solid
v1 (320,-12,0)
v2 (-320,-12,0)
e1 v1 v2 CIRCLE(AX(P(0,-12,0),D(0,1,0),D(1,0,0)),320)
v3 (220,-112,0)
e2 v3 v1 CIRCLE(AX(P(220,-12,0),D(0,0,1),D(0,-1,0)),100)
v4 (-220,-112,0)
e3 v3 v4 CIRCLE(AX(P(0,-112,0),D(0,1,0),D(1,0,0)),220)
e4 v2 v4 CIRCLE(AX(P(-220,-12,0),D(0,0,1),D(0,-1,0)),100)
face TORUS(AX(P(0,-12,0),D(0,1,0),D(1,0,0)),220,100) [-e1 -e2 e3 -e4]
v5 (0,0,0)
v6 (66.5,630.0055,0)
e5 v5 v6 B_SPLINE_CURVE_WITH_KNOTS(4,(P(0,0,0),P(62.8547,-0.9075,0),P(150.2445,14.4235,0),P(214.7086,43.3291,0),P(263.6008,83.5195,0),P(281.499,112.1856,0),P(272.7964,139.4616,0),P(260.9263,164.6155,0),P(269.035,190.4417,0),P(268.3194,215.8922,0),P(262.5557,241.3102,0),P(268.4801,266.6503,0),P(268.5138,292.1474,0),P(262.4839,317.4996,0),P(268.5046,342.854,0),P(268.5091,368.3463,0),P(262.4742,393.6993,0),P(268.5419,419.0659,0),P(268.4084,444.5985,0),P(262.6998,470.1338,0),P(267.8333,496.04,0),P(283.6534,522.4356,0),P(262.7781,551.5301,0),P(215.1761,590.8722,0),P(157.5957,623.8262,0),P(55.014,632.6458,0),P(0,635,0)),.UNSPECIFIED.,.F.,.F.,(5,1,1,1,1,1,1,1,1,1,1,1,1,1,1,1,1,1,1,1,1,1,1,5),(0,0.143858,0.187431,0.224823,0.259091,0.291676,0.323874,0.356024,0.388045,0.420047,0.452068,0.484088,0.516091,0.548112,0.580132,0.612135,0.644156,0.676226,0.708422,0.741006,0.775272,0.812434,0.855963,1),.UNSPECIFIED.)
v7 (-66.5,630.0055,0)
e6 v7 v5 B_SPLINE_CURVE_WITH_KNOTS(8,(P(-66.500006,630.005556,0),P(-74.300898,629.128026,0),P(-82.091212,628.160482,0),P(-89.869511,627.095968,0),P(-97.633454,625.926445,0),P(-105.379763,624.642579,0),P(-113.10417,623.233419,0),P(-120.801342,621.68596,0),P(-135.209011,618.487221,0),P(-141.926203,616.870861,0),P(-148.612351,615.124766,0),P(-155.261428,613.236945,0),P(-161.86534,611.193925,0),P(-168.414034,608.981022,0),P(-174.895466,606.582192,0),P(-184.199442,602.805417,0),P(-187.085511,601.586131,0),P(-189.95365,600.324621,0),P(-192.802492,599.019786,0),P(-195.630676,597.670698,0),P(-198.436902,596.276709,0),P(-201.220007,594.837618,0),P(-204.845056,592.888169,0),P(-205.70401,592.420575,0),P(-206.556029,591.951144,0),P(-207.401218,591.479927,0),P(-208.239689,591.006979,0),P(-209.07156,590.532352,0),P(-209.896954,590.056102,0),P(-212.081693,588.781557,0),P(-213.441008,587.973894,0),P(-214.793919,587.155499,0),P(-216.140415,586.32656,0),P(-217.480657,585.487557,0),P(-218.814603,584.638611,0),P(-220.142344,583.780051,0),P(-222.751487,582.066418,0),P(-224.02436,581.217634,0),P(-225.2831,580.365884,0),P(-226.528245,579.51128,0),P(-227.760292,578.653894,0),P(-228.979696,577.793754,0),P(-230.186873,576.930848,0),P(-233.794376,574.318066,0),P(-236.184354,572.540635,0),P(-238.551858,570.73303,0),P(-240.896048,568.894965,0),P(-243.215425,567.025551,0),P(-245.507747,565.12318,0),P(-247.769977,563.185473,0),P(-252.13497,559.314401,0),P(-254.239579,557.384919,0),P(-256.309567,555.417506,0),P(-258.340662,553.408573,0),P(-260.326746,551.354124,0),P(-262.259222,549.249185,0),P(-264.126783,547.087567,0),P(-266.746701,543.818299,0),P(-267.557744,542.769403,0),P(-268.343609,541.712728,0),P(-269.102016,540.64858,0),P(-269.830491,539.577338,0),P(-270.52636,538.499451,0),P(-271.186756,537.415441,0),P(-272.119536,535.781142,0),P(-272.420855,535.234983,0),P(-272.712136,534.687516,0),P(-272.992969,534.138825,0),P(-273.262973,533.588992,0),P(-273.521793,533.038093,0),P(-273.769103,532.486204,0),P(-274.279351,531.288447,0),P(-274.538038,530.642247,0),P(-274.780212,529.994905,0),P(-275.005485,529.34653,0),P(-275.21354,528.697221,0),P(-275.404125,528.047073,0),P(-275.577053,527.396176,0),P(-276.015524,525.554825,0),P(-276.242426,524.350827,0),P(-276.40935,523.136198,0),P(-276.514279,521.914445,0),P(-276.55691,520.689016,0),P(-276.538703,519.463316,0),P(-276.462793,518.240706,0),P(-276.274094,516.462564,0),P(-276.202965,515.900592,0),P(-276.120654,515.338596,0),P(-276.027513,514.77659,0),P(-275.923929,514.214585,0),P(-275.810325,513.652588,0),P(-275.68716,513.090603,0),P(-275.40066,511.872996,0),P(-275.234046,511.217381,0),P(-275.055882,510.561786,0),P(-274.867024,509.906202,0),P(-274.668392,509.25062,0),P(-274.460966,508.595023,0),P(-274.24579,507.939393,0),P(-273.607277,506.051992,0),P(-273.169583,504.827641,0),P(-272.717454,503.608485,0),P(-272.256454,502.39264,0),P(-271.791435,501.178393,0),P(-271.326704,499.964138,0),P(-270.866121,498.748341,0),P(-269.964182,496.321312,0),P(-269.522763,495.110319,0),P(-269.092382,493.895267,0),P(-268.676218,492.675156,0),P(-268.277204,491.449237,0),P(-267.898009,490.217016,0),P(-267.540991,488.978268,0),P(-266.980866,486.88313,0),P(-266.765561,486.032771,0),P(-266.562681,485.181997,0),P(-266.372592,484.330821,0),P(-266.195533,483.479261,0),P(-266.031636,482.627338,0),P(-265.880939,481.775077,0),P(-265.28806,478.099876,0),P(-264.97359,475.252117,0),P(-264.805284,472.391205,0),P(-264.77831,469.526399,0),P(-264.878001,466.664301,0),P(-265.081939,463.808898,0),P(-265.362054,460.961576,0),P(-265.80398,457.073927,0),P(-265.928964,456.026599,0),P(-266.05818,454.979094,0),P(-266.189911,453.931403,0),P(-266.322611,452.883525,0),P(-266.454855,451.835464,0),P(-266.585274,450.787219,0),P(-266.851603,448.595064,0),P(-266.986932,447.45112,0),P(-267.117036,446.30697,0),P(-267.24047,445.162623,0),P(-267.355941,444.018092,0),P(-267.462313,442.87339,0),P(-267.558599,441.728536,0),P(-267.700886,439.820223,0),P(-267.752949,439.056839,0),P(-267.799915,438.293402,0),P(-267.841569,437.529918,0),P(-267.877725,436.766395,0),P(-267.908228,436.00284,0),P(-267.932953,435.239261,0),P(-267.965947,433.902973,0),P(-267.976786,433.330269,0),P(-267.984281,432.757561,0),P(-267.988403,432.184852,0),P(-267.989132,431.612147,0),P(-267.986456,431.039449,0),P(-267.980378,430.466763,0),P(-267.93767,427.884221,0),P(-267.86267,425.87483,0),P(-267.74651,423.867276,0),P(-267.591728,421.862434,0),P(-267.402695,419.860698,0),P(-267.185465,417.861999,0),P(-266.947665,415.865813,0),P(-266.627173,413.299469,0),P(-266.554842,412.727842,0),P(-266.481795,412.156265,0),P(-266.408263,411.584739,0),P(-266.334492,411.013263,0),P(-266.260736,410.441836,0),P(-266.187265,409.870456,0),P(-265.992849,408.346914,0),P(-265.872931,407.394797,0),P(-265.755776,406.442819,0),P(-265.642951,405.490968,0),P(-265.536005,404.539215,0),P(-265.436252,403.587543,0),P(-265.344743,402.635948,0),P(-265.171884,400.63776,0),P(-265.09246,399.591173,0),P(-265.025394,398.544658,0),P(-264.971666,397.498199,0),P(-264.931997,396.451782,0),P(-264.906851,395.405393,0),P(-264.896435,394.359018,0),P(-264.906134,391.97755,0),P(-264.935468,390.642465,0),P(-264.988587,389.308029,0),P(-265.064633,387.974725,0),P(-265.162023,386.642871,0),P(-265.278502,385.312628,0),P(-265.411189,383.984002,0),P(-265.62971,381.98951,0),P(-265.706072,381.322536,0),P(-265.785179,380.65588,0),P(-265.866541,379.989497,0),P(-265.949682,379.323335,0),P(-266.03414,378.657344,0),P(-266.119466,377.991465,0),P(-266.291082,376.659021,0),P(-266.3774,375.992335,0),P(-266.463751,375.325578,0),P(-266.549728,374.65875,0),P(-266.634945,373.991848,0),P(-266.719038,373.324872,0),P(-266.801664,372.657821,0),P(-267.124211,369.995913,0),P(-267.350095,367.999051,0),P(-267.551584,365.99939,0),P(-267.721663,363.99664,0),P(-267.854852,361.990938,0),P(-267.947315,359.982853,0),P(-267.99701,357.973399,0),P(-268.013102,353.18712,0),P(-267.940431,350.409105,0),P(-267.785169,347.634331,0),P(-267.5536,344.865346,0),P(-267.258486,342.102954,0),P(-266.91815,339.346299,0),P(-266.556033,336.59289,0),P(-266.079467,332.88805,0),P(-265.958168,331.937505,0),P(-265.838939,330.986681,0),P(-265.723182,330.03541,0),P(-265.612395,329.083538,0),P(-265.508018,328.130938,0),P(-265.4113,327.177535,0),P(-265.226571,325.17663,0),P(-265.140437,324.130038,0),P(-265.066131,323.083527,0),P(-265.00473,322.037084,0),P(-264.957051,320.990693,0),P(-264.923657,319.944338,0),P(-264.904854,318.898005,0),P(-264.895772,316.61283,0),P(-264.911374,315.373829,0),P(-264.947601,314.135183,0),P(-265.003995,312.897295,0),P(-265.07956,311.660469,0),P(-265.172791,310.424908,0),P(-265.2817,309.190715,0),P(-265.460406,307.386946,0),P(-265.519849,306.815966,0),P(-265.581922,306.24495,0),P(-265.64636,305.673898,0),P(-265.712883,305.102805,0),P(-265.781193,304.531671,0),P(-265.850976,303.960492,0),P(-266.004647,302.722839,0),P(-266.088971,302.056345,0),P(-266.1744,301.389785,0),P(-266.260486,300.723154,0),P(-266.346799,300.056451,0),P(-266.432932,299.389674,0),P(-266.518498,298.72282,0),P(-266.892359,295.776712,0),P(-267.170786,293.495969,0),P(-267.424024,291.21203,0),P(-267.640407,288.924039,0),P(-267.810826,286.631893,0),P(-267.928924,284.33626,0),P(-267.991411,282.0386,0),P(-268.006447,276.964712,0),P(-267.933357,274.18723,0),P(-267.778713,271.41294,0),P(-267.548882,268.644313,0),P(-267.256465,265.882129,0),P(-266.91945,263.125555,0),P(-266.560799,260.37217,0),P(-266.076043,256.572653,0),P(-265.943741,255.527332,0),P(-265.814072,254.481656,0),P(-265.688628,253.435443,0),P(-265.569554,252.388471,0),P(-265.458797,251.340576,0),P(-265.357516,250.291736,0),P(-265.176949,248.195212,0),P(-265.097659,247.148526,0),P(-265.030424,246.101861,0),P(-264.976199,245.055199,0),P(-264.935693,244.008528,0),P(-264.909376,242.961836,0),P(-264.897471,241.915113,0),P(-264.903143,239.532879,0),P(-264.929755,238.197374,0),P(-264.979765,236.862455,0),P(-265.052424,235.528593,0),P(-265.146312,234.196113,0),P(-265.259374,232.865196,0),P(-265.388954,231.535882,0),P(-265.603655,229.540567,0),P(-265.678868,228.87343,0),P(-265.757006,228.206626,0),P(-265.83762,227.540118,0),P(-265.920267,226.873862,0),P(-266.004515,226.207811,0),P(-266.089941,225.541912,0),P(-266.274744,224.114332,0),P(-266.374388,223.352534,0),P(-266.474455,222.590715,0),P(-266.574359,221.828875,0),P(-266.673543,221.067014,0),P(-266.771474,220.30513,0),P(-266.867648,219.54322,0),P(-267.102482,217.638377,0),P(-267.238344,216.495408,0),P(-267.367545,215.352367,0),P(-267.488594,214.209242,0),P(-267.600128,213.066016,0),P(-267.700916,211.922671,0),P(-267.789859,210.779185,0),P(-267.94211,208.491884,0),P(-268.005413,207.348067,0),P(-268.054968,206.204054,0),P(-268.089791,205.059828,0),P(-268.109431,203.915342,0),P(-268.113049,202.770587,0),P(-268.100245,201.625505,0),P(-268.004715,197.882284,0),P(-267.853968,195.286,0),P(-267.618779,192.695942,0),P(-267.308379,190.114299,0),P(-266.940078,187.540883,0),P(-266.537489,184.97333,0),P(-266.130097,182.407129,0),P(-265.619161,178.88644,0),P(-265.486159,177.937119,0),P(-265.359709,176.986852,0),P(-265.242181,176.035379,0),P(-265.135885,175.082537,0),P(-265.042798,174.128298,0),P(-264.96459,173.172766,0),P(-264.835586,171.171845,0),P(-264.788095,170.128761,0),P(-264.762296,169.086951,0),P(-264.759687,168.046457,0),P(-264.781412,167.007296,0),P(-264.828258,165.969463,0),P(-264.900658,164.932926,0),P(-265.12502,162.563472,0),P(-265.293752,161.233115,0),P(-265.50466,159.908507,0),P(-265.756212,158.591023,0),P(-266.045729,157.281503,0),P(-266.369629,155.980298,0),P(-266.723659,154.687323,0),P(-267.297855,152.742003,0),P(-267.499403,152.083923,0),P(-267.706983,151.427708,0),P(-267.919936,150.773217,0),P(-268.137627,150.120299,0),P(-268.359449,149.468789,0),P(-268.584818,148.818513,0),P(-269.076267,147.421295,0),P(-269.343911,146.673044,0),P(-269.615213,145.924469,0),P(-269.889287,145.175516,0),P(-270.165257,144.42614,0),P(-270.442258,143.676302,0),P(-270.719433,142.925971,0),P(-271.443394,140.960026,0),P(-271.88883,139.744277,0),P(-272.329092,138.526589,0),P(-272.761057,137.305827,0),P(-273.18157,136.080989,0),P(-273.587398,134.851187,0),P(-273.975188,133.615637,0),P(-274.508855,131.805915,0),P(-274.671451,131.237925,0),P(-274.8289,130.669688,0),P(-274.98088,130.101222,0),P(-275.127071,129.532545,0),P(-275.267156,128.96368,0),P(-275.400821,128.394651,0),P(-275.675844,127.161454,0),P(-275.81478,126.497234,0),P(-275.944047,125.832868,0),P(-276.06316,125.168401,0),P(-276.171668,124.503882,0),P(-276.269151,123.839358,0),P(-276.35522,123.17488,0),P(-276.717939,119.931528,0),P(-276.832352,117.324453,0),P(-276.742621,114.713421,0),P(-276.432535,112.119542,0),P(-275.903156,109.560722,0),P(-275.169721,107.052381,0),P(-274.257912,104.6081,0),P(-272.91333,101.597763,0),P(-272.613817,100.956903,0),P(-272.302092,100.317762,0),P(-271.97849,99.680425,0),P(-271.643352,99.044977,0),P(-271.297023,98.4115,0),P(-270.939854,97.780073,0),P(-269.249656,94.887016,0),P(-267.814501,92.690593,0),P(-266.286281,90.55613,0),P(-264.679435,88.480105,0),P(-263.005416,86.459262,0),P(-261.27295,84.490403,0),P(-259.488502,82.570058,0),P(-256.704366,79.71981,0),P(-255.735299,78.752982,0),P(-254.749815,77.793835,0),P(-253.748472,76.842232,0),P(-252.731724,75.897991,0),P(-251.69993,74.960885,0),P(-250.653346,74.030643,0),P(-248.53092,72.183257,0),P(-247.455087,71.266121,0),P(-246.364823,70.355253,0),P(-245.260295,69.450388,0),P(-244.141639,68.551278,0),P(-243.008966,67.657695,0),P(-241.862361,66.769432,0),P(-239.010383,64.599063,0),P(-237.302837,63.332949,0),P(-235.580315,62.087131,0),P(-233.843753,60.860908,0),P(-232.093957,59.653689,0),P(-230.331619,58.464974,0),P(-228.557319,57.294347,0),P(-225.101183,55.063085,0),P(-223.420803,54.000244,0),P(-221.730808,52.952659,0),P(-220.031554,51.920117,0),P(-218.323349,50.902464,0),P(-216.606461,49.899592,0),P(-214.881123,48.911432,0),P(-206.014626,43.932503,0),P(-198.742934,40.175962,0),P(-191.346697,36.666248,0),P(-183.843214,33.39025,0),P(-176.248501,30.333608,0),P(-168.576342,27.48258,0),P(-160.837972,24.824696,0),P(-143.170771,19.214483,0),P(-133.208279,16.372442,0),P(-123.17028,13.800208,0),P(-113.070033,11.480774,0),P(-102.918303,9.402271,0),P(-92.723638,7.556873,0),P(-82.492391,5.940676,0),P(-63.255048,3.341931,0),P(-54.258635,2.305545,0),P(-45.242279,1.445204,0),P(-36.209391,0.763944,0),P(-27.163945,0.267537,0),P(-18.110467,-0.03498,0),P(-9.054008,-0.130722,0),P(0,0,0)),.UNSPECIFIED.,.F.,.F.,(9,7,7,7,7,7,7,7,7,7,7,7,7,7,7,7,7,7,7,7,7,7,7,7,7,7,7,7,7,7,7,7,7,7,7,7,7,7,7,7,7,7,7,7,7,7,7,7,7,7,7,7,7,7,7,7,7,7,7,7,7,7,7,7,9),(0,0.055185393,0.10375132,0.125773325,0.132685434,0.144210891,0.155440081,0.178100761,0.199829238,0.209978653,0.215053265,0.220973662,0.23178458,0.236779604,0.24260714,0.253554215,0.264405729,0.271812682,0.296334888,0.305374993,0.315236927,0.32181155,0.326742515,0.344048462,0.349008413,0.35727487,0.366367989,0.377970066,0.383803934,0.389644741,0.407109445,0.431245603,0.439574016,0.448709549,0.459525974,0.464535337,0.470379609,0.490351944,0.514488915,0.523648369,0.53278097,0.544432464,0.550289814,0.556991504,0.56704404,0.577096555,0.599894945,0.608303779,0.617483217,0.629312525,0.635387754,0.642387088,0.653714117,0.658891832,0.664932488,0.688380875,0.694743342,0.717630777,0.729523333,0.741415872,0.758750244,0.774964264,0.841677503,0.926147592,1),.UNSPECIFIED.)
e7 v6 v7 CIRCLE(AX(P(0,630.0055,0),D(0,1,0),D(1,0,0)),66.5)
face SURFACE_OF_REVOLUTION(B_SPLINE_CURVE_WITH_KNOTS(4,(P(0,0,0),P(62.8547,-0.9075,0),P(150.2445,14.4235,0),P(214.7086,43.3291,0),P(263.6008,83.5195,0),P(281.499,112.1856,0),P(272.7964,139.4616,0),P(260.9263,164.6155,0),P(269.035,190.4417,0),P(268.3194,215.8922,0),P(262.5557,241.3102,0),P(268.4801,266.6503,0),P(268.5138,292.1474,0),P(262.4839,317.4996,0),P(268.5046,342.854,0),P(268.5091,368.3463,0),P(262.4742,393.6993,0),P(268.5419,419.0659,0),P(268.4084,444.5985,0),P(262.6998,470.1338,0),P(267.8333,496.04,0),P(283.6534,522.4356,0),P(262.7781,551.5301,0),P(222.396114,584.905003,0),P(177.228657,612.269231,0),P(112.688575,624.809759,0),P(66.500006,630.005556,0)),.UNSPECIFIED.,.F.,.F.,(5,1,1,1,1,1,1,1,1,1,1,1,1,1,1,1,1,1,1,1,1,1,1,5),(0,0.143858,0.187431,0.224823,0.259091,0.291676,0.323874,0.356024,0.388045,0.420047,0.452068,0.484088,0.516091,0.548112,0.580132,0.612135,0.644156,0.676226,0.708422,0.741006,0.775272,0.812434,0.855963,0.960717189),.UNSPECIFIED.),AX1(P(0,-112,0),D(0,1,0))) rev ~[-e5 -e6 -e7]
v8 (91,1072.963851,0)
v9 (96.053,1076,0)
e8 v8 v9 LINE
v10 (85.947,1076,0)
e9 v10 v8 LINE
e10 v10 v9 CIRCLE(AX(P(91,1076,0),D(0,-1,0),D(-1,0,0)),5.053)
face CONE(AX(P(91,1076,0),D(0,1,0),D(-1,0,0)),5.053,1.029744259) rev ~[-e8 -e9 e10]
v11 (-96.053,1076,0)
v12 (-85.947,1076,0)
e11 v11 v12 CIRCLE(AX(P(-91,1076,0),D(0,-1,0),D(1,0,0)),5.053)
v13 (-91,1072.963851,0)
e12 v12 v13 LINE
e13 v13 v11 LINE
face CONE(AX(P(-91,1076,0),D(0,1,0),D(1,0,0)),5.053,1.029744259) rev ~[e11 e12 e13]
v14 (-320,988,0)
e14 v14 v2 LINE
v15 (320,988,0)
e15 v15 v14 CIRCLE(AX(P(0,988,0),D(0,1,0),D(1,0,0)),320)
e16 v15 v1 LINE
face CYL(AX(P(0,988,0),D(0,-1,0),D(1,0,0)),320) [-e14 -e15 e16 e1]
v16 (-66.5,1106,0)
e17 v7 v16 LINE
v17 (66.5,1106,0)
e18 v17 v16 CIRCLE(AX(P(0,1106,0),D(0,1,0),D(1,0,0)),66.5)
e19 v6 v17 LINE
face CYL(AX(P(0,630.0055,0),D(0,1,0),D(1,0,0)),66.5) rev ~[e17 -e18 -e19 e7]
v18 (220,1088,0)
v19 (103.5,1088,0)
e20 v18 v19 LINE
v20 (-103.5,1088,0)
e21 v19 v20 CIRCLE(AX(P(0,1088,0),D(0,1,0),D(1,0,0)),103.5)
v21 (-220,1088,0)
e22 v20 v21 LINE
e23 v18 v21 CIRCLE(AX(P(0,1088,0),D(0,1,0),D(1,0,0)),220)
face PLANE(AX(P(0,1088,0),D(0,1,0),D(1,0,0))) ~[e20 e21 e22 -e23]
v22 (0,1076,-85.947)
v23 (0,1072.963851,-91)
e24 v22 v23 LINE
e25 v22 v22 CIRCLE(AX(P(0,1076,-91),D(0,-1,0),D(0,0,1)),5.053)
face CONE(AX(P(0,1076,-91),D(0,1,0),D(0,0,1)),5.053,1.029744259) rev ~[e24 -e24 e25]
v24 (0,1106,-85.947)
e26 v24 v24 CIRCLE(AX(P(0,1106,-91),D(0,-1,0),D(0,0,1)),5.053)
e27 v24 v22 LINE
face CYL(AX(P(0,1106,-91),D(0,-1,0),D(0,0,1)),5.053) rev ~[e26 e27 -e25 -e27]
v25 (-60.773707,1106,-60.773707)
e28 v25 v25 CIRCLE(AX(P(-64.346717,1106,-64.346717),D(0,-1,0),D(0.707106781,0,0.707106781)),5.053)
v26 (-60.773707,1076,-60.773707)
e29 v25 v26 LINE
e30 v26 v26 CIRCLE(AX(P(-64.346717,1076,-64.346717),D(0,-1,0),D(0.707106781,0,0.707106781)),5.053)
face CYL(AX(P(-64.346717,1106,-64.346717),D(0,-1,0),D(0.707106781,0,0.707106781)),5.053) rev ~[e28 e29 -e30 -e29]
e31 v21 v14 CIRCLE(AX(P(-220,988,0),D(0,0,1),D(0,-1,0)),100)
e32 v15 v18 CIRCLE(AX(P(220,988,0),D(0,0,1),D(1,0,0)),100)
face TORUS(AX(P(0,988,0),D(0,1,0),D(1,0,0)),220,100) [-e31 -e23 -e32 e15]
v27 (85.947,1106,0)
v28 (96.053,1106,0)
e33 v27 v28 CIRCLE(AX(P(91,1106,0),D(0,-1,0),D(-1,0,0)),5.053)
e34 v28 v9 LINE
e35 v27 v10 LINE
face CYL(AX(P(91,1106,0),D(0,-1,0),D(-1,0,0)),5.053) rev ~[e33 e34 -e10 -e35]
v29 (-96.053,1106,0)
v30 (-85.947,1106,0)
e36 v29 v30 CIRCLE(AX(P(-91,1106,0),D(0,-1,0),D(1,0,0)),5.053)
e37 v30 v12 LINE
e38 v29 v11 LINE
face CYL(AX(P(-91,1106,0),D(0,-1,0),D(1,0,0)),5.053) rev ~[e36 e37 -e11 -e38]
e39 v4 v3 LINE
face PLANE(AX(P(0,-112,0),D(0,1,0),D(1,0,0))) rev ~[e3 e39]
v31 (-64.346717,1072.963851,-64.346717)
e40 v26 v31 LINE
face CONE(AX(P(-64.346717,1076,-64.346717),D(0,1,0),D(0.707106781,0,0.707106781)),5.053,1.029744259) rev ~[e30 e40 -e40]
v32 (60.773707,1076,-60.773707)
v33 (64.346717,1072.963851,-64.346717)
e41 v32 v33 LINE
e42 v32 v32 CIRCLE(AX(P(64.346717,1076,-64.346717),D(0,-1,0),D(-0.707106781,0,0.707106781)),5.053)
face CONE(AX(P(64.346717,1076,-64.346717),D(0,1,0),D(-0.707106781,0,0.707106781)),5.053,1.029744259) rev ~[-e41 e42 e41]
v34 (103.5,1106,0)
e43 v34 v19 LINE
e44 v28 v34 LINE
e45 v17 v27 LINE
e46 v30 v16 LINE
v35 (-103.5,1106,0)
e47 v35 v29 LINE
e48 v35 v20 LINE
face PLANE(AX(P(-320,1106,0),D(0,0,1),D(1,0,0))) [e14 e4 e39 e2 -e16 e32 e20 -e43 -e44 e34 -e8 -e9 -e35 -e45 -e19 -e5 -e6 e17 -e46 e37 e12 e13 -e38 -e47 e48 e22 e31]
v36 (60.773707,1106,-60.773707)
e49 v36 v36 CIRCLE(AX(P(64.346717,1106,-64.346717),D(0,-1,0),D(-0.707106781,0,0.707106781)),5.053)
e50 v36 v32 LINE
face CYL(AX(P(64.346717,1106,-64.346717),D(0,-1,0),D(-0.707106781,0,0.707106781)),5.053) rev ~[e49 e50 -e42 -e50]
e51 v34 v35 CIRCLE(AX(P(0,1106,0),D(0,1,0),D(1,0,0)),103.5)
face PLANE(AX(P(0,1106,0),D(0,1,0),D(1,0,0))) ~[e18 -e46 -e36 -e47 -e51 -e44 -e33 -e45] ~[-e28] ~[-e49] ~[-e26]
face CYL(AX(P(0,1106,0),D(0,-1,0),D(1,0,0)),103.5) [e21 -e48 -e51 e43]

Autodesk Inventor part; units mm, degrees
ref_plane "YZ Plane" through (0, 0, 0) normal (1, 0, 0) x (0, 1, 0)
ref_plane "XZ Plane" through (0, 0, 0) normal (0, 1, 0) x (-1, 0, 0)
ref_plane "XY Plane" through (0, 0, 0) normal (0, 0, 1) x (1, 0, 0)
sketch "InnerShape" plane through (0, 0, 0) normal (0, 0, 1) x (1, 0, 0)
  spline S0 degree 4 poles (25.5438, 42.0281) (88.3985, 41.1205) (175.7883, 56.4516) (240.2524, 85.3572) (289.1446, 125.5476) (307.0428, 154.2136) (298.3402, 181.4897) (286.4701, 206.6436) (294.5788, 232.4697) (293.8632, 257.9202) (288.0995, 283.3382) (294.0239, 308.6783) (294.0576, 334.1754) (288.0277, 359.5276) (294.0484, 384.8821) (294.0529, 410.3743) (288.018, 435.7273) (294.0857, 461.094) (293.9522, 486.6266) (288.2436, 512.1618) (293.3771, 538.0681) (309.1971, 564.4637) (288.3219, 593.5581) (240.7199, 632.9003) (183.1395, 665.8542) (80.5578, 674.6739) (25.5438, 677.0281) knots 0 0 0 0 0 0.143858 0.187431 0.224823 0.259091 0.291676 0.323874 0.356024 0.388045 0.420047 0.452068 0.484088 0.516091 0.548112 0.580132 0.612135 0.644156 0.676226 0.708422 0.741006 0.775272 0.812434 0.855963 1 1 1 1 1
  point P0 (254.729, 359.5281)
  point P1 (142.9438, 54.7281)
  point P2 (219.4438, 80.1281)
  point P3 (263.0438, 105.5281)
  point P4 (290.4438, 130.9281)
  point P5 (302.0438, 156.3281)
  point P6 (297.4438, 181.7281)
  point P7 (290.4438, 207.1281)
  point P8 (292.8438, 232.5281)
  point P9 (292.8438, 257.9281)
  point P10 (290.4438, 283.3281)
  point P11 (292.8438, 308.7281)
  point P12 (292.8438, 334.1281)
  point P13 (290.4438, 359.5281)
  point P14 (292.8438, 384.9281)
  point P15 (292.8438, 410.3281)
  point P16 (290.4438, 435.7281)
  point P17 (292.8438, 461.1281)
  point P18 (292.8438, 486.5281)
  point P19 (290.4438, 511.9281)
  point P20 (295.1438, 537.3281)
  point P21 (302.0438, 562.7281)
  point P22 (290.4438, 588.1281)
  point P23 (263.0438, 613.5281)
  point P24 (222.6438, 638.9281)
  point P25 (142.9438, 664.3281)
sketch "Sketch2" plane through (0, 0, 0) normal (0, 0, 1) x (1, 0, 0)
  line L0 (66.5, 630.0055) -> (66.5, 1106)
  line L1 (66.5, 1106) -> (103.5, 1106)
  line L2 (103.5, 1106) -> (103.5, 1088)
  line L3 (103.5, 1088) -> (220, 1088)
  line L4 (320, 988) -> (320, -12)
  line L5 (220, -112) -> (0, -112)
  line L6 (0, -112) -> (0, 0)
  arc A0 (320, 988) -> (220, 1088) centre (220, 988) ccw
  arc A1 (220, -112) -> (320, -12) centre (220, -12) ccw
  spline S0 degree 4 poles (0, 0) (62.8547, -0.9075) (150.2445, 14.4235) (214.7086, 43.3291) (263.6008, 83.5195) (281.499, 112.1856) (272.7964, 139.4616) (260.9263, 164.6155) (269.035, 190.4417) (268.3194, 215.8922) (262.5557, 241.3102) (268.4801, 266.6503) (268.5138, 292.1474) (262.4839, 317.4996) (268.5046, 342.854) (268.5091, 368.3463) (262.4742, 393.6993) (268.5419, 419.0659) (268.4084, 444.5985) (262.6998, 470.1338) (267.8333, 496.04) (283.6534, 522.4356) (262.7781, 551.5301) (215.1761, 590.8722) (157.5957, 623.8262) (55.014, 632.6458) (0, 635) knots 0 0 0 0 0 0.143858 0.187431 0.224823 0.259091 0.291676 0.323874 0.356024 0.388045 0.420047 0.452068 0.484088 0.516091 0.548112 0.580132 0.612135 0.644156 0.676226 0.708422 0.741006 0.775272 0.812434 0.855963 1 1 1 1 1
  point P0 (320, 1088)
  point P1 (320, -112)
  point P2 (0, 0)
  dimension "d9" = 1106
  dimension "d10" = 66.5
  dimension "d11" = 103.5
  dimension "d12" = 320
  dimension "d13" = 18
  dimension "d14" = 1200
  dimension "d15" = 100
  dimension "d16" = 100
revolve "Revolution1" add sketch "Sketch2" angle 360 about axis through (0, -112, 0) along (0, 1, 0)
sketch "Sketch3" plane through (0, 1106, 0) normal (0, 1, 0) x (1, 0, 0)
  point P0 (0, 0)
  point P1 (0, 91)
  dimension "d18" = 91
hole "Hole1" at (0, 1106, -91) direction (0, -1, 0) diameter 10.106 depth 30 tip angle 118 thread size "M12x1.75" class "6H" standard "ISO Metric profile"
pattern_circular "Circular Pattern1" count 8 over 360 about axis through (0, 868.0028, 0) along (0, 1, 0) of "Hole1"
sketch "Sketch5" plane through (0, 1106, 0) normal (0, 1, 0) x (1, 0, 0)
  circle A0 centre (0, 0) radius 320 projected
  line L0 (-320, 0) -> (320, 0)
  line L1 (320, 0) -> (320, -320)
  line L2 (320, -320) -> (-320, -320)
  line L3 (-320, -320) -> (-320, 0)
  point P0 (0, -320)
extrude "Extrusion2" cut sketch "Sketch5" against normal through all contours A0 L0 | A0 L2 L3 picked at (-65.063, -184.508)
properties part number "TransportDewar"
